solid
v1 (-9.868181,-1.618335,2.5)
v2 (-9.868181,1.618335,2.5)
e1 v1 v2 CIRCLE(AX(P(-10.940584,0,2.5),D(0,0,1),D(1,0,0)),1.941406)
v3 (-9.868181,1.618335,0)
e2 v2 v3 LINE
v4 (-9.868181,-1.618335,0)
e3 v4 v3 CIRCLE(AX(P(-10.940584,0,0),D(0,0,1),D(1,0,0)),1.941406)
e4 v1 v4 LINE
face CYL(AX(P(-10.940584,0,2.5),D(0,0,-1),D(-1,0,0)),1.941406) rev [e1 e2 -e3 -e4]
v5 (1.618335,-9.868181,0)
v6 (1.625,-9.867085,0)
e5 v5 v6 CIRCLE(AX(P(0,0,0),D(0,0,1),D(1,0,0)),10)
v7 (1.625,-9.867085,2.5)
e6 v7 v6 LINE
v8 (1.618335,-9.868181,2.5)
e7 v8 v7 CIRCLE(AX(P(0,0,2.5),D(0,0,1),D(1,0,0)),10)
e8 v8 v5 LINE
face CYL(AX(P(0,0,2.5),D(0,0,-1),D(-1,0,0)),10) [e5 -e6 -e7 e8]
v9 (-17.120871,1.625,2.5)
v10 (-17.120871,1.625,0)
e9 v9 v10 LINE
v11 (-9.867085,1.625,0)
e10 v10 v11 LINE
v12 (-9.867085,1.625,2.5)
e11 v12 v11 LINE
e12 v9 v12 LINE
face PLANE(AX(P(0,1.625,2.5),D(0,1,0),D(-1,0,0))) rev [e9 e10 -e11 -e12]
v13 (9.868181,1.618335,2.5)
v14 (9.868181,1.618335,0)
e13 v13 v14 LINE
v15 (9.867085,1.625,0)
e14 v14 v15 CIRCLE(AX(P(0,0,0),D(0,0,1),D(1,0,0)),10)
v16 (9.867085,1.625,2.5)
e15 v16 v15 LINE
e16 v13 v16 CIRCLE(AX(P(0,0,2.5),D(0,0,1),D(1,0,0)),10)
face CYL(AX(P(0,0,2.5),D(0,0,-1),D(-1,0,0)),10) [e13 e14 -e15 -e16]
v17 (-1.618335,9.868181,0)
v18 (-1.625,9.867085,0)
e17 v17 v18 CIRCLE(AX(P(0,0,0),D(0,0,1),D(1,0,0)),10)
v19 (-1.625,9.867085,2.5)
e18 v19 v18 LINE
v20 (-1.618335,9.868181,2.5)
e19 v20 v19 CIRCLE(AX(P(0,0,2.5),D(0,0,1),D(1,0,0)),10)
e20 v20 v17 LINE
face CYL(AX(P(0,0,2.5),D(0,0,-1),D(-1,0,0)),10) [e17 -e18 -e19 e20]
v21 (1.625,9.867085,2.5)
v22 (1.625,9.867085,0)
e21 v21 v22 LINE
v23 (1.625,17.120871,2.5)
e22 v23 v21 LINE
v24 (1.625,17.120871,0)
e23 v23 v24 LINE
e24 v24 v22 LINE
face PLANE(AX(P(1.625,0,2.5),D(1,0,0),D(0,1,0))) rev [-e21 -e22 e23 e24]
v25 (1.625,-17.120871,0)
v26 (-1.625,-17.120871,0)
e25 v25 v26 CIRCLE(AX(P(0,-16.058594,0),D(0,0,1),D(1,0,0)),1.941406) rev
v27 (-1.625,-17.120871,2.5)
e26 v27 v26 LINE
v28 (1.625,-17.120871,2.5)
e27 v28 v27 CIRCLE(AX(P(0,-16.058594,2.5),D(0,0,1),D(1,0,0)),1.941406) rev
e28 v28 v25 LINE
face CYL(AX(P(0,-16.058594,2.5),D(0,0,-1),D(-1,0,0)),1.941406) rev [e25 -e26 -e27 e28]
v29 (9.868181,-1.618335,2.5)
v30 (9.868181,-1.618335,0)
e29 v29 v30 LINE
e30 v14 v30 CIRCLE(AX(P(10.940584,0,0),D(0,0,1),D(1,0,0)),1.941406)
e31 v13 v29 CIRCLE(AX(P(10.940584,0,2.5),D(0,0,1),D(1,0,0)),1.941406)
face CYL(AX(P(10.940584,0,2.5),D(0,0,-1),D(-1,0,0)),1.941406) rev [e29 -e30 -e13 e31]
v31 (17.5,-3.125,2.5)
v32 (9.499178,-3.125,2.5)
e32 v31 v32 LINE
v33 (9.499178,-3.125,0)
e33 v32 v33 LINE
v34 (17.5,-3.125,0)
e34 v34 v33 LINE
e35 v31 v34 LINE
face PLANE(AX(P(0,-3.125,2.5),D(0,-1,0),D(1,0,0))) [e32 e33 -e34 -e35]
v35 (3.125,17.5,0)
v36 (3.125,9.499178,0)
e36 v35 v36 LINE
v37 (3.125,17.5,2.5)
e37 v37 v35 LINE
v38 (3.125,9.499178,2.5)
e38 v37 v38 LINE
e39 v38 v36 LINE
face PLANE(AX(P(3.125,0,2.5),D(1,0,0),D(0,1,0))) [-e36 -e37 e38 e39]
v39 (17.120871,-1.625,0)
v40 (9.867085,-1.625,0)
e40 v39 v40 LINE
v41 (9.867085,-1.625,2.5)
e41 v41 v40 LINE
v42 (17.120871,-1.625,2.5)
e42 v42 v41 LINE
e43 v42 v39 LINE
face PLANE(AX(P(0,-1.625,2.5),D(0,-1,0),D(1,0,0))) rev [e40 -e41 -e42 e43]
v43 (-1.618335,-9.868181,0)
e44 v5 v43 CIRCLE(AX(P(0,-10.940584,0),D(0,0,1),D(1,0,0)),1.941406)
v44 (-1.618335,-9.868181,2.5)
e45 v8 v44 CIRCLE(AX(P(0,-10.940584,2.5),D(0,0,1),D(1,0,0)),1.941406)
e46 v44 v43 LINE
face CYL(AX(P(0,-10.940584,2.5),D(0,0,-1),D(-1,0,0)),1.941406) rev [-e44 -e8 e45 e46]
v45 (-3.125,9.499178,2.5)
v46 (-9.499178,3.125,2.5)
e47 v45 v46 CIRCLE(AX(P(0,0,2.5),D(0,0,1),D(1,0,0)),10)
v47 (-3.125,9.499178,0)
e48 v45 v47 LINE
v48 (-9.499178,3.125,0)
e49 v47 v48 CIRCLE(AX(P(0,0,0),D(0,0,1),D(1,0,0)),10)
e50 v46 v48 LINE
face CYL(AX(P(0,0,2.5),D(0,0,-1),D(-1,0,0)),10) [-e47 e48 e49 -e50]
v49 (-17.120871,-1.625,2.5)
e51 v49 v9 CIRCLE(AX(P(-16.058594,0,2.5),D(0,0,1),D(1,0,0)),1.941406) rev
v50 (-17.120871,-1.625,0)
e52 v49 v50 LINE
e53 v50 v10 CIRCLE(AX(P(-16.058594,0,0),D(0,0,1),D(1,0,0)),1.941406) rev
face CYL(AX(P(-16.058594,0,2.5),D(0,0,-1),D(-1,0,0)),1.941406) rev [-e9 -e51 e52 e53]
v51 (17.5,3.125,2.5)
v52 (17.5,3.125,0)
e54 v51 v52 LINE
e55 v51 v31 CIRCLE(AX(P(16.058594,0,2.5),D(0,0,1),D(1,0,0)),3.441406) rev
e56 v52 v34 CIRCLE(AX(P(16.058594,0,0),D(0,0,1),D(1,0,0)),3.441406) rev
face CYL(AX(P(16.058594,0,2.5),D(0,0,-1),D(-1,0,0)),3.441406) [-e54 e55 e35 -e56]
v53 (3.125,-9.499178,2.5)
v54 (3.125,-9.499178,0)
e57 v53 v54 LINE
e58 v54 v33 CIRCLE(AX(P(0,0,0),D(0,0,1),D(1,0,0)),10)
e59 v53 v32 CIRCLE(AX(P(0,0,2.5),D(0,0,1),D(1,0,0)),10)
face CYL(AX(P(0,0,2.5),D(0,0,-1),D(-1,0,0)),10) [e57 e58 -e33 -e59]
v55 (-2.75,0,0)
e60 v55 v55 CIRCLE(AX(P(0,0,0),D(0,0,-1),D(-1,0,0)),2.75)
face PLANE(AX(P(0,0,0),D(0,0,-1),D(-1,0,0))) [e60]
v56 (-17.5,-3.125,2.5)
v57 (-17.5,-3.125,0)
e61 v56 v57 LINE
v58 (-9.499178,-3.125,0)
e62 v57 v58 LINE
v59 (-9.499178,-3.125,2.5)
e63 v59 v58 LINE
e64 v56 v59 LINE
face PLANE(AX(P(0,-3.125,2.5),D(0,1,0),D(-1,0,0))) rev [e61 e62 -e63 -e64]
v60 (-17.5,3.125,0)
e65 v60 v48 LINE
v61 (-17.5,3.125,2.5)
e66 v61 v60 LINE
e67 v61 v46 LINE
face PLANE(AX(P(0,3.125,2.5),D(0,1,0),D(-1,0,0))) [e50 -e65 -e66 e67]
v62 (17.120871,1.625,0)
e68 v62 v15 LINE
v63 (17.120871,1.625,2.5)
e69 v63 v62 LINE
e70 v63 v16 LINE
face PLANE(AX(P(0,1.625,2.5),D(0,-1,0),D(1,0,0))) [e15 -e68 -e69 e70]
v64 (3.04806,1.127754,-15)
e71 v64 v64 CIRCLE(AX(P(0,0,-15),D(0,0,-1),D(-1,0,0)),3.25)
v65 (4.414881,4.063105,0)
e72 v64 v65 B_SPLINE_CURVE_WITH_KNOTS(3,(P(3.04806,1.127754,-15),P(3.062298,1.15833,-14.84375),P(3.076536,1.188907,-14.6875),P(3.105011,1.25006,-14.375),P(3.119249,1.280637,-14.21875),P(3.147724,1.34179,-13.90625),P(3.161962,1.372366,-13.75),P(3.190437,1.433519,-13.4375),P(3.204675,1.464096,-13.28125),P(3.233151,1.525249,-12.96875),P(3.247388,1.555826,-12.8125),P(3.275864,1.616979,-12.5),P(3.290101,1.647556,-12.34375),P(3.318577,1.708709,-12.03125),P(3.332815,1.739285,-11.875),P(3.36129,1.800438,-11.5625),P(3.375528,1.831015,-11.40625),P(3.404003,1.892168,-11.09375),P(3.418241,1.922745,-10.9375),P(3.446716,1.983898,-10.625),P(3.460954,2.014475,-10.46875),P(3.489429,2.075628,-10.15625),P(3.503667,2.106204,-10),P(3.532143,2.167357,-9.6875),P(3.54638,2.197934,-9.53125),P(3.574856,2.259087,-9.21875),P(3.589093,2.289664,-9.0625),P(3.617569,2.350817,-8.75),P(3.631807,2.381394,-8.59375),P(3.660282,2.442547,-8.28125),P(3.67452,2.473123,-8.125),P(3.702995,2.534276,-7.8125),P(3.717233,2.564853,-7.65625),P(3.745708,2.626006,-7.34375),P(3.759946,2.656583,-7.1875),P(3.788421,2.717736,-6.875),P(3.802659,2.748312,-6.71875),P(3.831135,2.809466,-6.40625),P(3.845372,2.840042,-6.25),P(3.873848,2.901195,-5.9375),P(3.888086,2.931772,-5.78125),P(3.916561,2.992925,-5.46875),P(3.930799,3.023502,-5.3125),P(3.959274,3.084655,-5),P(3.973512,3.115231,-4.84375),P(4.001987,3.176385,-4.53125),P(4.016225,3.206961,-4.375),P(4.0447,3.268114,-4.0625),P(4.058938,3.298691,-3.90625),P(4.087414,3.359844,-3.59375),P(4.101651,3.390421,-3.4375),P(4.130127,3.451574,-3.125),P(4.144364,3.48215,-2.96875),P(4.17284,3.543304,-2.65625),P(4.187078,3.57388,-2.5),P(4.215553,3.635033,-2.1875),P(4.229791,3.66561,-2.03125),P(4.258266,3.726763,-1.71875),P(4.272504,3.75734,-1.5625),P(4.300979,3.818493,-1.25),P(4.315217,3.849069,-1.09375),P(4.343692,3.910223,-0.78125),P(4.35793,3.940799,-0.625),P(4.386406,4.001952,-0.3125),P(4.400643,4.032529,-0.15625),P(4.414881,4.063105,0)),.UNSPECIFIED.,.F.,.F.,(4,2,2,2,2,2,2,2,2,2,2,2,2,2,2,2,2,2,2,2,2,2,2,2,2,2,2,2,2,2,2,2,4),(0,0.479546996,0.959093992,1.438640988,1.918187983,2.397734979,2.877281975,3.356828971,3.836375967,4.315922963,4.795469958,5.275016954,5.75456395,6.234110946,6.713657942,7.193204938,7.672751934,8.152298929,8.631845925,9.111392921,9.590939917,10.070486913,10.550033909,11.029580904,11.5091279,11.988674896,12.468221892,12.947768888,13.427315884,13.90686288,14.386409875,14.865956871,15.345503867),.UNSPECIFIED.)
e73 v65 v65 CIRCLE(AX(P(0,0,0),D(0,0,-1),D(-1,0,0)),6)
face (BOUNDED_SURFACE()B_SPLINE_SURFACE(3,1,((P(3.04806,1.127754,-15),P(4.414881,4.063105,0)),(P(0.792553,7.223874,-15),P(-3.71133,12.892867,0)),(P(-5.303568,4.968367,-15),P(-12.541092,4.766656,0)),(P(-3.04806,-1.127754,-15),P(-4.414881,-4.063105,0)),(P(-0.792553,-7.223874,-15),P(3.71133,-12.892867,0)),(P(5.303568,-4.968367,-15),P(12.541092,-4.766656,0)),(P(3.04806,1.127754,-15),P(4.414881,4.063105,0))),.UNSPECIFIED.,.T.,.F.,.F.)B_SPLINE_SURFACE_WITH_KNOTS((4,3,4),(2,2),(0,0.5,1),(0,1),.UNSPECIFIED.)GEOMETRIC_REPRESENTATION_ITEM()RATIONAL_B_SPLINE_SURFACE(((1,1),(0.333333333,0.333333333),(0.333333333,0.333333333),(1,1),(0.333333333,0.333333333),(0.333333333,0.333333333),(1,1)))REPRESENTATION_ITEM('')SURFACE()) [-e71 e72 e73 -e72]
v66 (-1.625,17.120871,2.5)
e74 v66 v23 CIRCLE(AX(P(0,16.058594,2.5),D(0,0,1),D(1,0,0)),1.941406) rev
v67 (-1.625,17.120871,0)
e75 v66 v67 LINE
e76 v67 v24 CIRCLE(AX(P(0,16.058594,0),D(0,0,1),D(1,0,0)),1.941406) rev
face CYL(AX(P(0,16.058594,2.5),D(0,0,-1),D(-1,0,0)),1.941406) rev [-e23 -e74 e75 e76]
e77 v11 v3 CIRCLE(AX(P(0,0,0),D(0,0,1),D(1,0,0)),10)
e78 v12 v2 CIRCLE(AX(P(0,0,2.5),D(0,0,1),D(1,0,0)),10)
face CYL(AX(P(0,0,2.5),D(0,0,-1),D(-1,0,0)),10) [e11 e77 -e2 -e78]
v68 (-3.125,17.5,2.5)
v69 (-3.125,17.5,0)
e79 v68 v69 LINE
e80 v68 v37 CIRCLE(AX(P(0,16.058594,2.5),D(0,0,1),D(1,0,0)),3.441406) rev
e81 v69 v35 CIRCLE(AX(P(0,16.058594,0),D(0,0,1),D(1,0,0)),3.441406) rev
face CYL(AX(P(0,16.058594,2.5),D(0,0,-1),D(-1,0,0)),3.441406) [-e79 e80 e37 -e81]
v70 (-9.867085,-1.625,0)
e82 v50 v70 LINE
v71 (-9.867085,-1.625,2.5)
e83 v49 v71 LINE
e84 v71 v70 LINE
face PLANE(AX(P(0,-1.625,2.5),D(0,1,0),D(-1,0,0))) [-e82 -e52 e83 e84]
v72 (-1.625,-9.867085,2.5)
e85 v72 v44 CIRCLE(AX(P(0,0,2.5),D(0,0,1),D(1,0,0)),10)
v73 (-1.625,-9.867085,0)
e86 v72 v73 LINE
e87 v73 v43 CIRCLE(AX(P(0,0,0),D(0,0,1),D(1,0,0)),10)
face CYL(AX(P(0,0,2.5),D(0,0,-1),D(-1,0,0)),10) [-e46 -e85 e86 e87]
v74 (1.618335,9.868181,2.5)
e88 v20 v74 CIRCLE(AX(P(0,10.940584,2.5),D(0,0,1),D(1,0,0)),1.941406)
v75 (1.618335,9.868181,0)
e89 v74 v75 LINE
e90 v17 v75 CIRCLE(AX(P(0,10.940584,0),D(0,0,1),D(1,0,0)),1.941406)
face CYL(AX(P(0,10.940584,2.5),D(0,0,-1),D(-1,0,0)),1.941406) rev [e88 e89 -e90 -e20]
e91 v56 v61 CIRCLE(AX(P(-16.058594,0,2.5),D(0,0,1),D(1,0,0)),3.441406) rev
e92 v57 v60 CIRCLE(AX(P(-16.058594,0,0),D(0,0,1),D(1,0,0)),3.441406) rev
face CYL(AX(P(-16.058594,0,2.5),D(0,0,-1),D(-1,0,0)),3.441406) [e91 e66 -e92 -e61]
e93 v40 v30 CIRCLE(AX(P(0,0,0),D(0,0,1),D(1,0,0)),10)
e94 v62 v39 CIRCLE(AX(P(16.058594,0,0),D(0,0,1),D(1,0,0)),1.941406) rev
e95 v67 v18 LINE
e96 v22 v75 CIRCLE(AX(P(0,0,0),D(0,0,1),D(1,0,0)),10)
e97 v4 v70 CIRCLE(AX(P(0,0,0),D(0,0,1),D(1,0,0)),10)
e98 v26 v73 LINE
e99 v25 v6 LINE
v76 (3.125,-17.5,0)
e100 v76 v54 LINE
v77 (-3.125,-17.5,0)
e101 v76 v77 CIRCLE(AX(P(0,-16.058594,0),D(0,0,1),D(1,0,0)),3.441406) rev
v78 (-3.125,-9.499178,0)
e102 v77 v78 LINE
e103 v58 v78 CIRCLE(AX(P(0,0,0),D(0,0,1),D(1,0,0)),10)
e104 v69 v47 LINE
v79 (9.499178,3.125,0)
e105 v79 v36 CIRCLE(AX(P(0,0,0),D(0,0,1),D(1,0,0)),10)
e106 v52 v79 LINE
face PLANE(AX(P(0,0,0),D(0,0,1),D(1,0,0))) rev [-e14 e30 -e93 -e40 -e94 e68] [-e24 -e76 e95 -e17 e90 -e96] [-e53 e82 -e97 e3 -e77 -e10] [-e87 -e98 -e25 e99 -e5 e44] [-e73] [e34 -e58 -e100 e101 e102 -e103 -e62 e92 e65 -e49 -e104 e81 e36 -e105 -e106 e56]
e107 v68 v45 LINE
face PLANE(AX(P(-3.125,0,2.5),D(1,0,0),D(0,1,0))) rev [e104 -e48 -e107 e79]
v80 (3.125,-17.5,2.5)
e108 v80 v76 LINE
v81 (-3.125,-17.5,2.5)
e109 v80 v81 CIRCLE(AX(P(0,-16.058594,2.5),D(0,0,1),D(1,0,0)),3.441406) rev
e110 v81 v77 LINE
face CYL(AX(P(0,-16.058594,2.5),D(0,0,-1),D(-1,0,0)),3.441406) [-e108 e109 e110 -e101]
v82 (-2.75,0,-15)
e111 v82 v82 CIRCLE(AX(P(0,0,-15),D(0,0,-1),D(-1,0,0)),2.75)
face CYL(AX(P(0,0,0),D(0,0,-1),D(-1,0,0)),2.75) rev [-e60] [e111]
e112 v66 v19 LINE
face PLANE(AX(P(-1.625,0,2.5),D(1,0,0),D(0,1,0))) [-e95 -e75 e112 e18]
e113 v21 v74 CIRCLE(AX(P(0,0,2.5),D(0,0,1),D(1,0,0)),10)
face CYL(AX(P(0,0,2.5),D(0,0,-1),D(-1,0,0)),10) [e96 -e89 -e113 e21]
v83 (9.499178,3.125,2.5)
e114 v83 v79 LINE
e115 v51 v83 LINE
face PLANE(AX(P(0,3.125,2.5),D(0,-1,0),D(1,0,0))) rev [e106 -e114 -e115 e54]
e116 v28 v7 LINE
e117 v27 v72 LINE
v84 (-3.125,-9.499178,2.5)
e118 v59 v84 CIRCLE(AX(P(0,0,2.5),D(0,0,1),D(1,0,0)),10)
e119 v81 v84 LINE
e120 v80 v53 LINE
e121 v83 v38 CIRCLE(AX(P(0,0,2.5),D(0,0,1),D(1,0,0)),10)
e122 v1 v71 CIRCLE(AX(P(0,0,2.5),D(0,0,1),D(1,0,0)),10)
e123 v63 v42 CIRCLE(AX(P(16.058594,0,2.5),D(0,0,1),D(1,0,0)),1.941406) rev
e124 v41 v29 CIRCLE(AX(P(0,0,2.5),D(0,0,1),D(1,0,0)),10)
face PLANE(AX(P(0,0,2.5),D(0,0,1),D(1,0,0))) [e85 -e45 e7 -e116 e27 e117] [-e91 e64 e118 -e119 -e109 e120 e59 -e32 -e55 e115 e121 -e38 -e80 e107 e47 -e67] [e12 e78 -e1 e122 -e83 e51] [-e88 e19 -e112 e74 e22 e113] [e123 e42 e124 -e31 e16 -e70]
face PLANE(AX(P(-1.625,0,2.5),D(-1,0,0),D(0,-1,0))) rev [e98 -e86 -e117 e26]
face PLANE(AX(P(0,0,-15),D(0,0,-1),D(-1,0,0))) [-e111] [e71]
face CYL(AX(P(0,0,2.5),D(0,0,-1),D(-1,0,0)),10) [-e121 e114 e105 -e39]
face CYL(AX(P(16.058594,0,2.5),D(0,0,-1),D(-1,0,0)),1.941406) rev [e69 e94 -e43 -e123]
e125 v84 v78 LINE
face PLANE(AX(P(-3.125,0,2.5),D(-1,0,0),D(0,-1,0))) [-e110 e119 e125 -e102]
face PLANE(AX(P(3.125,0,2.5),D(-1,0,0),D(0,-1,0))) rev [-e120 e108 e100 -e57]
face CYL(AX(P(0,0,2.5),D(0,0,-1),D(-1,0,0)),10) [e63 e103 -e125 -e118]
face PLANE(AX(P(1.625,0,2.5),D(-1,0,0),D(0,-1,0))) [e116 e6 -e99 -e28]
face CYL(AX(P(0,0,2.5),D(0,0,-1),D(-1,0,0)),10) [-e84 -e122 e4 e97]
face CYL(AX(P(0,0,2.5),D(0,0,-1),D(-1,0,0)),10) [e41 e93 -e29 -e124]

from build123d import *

# Parameters (mm, degrees)
BOSS_EXTRUDE1_DEPTH = 2.5
SKETCH16_R          = 2.75
CUT_EXTRUDE2_DEPTH  = 15


with BuildPart() as part:
    # Sketch1 → Boss-Extrude1 (new body)
    with BuildSketch(Plane.XY):
        with BuildLine():
            Line((3.125, -17.5), (3.125, -9.499177596))
            ThreePointArc((3.125, -9.499177596), (7.071067812, -7.071067812), (9.499177596, -3.125))
            Line((9.499177596, -3.125), (17.5, -3.125))
            ThreePointArc((17.5, -3.125), (19.5, 0), (17.5, 3.125))
            Line((17.5, 3.125), (9.499177596, 3.125))
            ThreePointArc((9.499177596, 3.125), (7.071067812, 7.071067812), (3.125, 9.499177596))
            Line((3.125, 9.499177596), (3.125, 17.5))
            ThreePointArc((3.125, 17.5), (0, 19.5), (-3.125, 17.5))
            Line((-3.125, 17.5), (-3.125, 9.499177596))
            ThreePointArc((-3.125, 9.499177596), (-7.071067812, 7.071067812), (-9.499177596, 3.125))
            Line((-9.499177596, 3.125), (-17.5, 3.125))
            ThreePointArc((-17.5, 3.125), (-19.5, 0), (-17.5, -3.125))
            Line((-17.5, -3.125), (-9.499177596, -3.125))
            ThreePointArc((-9.499177596, -3.125), (-7.071067812, -7.071067812), (-3.125, -9.499177596))
            Line((-3.125, -9.499177596), (-3.125, -17.5))
            ThreePointArc((-3.125, -17.5), (0, -19.5), (3.125, -17.5))
        make_face()
        with BuildLine():
            ThreePointArc((-9.868180698, -1.618335477), (-9.86763363, -1.621667831), (-9.867085436, -1.625))
            Line((-9.867085436, -1.625), (-9.878306468, -1.625))
            Line((-9.878306468, -1.625), (-17.120871128, -1.625))
            ThreePointArc((-17.120871128, -1.625), (-18, 0), (-17.120871128, 1.625))
            Line((-17.120871128, 1.625), (-9.878306468, 1.625))
            Line((-9.878306468, 1.625), (-9.867085436, 1.625))
            ThreePointArc((-9.867085436, 1.625), (-9.86763363, 1.621667831), (-9.868180698, 1.618335477))
            ThreePointArc((-9.868180698, 1.618335477), (-8.999177596, 0), (-9.868180698, -1.618335477))
        make_face(mode=Mode.SUBTRACT)
        with BuildLine():
            ThreePointArc((-1.618335477, -9.868180698), (0, -8.999177596), (1.618335477, -9.868180698))
            ThreePointArc((1.618335477, -9.868180698), (1.621667831, -9.86763363), (1.625, -9.867085436))
            Line((1.625, -9.867085436), (1.625, -9.878306468))
            Line((1.625, -9.878306468), (1.625, -17.120871128))
            ThreePointArc((1.625, -17.120871128), (0, -18), (-1.625, -17.120871128))
            Line((-1.625, -17.120871128), (-1.625, -9.878306468))
            Line((-1.625, -9.878306468), (-1.625, -9.867085436))
            ThreePointArc((-1.625, -9.867085436), (-1.621667831, -9.86763363), (-1.618335477, -9.868180698))
        make_face(mode=Mode.SUBTRACT)
        with BuildLine():
            Line((1.625, 9.878306468), (1.625, 9.867085436))
            ThreePointArc((1.625, 9.867085436), (1.621667831, 9.86763363), (1.618335477, 9.868180698))
            ThreePointArc((1.618335477, 9.868180698), (0, 8.999177596), (-1.618335477, 9.868180698))
            ThreePointArc((-1.618335477, 9.868180698), (-1.621667831, 9.86763363), (-1.625, 9.867085436))
            Line((-1.625, 9.867085436), (-1.625, 9.878306468))
            Line((-1.625, 9.878306468), (-1.625, 17.120871128))
            ThreePointArc((-1.625, 17.120871128), (0, 18), (1.625, 17.120871128))
            Line((1.625, 17.120871128), (1.625, 9.878306468))
        make_face(mode=Mode.SUBTRACT)
        with BuildLine():
            ThreePointArc((9.868180698, 1.618335477), (9.86763363, 1.621667831), (9.867085436, 1.625))
            Line((9.867085436, 1.625), (9.878306468, 1.625))
            Line((9.878306468, 1.625), (17.120871128, 1.625))
            ThreePointArc((17.120871128, 1.625), (18, 0), (17.120871128, -1.625))
            Line((17.120871128, -1.625), (9.878306468, -1.625))
            Line((9.878306468, -1.625), (9.867085436, -1.625))
            ThreePointArc((9.867085436, -1.625), (9.86763363, -1.621667831), (9.868180698, -1.618335477))
            ThreePointArc((9.868180698, -1.618335477), (8.999177596, 0), (9.868180698, 1.618335477))
        make_face(mode=Mode.SUBTRACT)
    extrude(amount=BOSS_EXTRUDE1_DEPTH)

    # Loft2: read off the stored shape, not the designer's step
    # Loft2: loft between two sections, ruled curve by curve
    loft2_from = [
        Edge.make_bspline([(3.048060313, 1.127753665, -15), (0.792552983, 7.223874291, -15), (-5.303567643, 4.968366961, -15), (-3.048060313, -1.127753665, -15), (-0.792552983, -7.223874291, -15), (5.303567643, -4.968366961, -15), (3.048060313, 1.127753665, -15)], [0, 0, 0, 0, 0.5, 0.5, 0.5, 1, 1, 1, 1], 3, [1, 0.333333333, 0.333333333, 1, 0.333333333, 0.333333333, 1]),
    ]
    loft2_to = [
        Edge.make_bspline([(4.41488096, 4.063105476, 0), (-3.711329991, 12.892867396, 0), (-12.541091911, 4.766656445, 0), (-4.41488096, -4.063105476, 0), (3.711329991, -12.892867396, 0), (12.541091911, -4.766656445, 0), (4.41488096, 4.063105476, 0)], [0, 0, 0, 0, 0.5, 0.5, 0.5, 1, 1, 1, 1], 3, [1, 0.333333333, 0.333333333, 1, 0.333333333, 0.333333333, 1]),
    ]
    loft2 = Solid(Shell([*[Face.make_surface_from_curves(loft2_from[k], loft2_to[k]) for k in range(1)], Face(Wire(loft2_from)), Face(Wire(loft2_to))]))
    add(loft2)

    # Sketch16 → Cut-Extrude2 (cut)
    with BuildSketch(Plane(origin=(0, 0, -15), x_dir=(-1, 0, 0), z_dir=(0, 0, -1))):
        Circle(SKETCH16_R)
    extrude(amount=-CUT_EXTRUDE2_DEPTH, mode=Mode.SUBTRACT)


solid = part.part
